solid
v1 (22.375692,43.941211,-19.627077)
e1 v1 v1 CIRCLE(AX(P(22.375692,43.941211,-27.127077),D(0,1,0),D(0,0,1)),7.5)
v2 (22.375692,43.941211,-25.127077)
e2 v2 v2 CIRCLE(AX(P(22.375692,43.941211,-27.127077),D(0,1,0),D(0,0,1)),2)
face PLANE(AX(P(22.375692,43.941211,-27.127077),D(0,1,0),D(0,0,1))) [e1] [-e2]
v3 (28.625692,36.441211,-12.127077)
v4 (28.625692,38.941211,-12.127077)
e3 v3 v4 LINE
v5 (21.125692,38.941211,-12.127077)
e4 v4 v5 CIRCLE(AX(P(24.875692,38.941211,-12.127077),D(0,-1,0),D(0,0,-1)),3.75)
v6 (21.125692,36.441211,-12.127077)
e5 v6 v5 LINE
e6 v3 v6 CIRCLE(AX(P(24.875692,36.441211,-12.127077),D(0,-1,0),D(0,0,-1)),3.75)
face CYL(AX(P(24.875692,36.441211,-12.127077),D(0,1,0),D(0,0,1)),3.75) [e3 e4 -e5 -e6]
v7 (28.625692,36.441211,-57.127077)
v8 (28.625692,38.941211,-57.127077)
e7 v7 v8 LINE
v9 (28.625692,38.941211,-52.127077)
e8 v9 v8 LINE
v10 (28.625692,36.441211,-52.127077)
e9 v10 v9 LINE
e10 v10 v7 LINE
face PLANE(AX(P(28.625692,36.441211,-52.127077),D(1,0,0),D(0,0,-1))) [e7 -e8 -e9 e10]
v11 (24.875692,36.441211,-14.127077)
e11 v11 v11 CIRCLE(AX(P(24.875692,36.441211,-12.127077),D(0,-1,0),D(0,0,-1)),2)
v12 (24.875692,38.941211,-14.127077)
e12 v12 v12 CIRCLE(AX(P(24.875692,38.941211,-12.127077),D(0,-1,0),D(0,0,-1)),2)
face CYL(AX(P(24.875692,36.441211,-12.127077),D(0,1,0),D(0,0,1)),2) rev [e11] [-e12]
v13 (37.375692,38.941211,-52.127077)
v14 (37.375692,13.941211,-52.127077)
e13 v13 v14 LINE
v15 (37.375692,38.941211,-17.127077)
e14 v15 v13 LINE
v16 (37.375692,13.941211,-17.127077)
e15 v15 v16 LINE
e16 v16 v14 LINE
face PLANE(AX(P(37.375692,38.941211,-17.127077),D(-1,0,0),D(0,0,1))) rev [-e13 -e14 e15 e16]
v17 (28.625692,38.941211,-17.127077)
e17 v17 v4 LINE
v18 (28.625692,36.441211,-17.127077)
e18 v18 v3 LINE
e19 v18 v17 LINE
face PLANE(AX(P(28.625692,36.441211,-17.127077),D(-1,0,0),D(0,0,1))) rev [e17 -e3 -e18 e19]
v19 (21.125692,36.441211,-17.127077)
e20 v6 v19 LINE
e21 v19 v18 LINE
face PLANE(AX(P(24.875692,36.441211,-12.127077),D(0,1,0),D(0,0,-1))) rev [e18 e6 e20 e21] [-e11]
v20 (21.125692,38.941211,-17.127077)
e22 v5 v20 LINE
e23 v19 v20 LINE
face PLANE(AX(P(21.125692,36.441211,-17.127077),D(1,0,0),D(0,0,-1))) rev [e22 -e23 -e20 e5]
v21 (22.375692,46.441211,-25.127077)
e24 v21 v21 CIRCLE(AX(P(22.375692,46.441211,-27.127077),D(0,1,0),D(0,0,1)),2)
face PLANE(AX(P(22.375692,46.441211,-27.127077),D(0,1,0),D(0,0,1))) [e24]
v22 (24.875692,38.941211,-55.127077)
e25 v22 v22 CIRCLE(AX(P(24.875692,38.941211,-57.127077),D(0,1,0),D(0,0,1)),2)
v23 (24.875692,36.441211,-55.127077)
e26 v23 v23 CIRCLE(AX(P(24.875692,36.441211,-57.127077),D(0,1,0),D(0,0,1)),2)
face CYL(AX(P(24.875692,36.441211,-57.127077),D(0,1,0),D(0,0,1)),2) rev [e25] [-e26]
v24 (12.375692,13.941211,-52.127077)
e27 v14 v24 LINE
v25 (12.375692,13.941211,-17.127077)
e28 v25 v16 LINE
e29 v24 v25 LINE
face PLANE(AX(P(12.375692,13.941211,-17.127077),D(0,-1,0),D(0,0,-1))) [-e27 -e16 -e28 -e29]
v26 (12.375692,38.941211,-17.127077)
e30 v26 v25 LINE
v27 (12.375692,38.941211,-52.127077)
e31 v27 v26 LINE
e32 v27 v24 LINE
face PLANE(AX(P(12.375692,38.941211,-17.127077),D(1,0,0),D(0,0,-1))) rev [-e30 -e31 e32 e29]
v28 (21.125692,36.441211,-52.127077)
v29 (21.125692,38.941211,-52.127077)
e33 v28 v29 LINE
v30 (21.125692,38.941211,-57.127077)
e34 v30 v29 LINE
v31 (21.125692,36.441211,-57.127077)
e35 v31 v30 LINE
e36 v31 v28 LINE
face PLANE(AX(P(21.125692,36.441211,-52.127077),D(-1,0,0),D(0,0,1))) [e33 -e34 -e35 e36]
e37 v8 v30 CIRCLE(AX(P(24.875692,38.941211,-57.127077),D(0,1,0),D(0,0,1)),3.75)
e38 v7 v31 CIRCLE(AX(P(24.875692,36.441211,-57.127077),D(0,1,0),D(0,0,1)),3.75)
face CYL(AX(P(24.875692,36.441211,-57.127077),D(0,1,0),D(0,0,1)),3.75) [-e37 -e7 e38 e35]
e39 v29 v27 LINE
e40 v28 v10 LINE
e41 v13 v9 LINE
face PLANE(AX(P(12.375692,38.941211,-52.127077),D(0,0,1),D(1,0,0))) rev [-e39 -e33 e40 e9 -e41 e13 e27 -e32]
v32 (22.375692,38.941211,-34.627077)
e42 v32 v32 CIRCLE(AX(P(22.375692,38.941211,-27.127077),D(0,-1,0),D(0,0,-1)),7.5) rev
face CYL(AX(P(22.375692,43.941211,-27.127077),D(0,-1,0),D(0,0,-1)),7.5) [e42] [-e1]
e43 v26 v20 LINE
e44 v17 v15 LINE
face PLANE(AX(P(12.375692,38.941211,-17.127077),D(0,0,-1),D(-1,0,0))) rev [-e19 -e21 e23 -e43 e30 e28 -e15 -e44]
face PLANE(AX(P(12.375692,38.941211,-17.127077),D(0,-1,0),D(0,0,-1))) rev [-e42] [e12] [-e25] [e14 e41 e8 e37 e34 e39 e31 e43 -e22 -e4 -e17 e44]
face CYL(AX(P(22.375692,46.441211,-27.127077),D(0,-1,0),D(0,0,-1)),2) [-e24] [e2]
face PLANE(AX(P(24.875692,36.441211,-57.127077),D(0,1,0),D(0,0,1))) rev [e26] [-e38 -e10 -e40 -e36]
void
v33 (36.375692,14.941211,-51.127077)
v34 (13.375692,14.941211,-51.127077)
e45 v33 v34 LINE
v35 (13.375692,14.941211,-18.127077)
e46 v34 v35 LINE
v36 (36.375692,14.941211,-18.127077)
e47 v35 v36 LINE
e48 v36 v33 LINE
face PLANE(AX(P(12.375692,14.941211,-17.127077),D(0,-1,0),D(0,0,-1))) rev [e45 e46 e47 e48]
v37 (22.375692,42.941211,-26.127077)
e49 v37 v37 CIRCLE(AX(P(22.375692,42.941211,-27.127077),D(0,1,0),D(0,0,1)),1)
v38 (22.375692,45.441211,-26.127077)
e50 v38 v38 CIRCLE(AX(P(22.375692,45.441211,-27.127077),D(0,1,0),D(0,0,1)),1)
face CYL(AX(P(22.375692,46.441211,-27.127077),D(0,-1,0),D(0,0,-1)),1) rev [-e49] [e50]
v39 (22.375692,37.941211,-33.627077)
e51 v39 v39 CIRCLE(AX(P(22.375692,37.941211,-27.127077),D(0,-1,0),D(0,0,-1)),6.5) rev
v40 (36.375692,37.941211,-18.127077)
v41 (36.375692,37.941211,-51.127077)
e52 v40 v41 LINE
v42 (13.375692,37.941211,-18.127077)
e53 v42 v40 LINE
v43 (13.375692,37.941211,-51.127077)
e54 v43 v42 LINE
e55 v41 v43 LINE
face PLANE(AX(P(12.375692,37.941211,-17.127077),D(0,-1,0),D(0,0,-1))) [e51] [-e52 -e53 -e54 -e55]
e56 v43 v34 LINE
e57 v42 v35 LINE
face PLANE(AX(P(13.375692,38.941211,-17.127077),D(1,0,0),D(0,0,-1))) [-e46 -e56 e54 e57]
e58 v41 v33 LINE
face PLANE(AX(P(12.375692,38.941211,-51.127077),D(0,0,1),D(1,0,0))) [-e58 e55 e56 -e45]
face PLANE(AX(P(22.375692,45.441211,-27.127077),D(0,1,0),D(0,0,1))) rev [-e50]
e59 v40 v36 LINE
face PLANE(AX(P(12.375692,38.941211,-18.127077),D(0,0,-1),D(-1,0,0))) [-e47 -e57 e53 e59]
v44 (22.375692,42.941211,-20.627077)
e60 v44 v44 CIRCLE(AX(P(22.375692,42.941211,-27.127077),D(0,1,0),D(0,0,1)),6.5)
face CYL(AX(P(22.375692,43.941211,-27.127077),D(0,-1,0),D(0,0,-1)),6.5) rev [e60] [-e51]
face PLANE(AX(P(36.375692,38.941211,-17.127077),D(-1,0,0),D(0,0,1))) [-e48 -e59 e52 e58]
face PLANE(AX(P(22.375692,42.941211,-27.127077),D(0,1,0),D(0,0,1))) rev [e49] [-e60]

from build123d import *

# Parameters (mm, degrees)
SKETCH1_W           = 50
SKETCH1_H           = 70
BOSS_EXTRUDE1_DEPTH = 50
SKETCH2_R           = 15
BOSS_EXTRUDE2_DEPTH = 10
SKETCH3_R           = 4
BOSS_EXTRUDE3_DEPTH = 5
SHELL7_START        = 2
SHELL7_OUTLINE_W    = 46
SHELL7_OUTLINE_H    = 66
SHELL7_DEPTH        = 46
SHELL7_START_2      = 48
SHELL7_2_OUTLINE_R  = 13
SHELL7_2_DEPTH      = 10
SHELL7_START_3      = 58
SHELL7_3_OUTLINE_R  = 2
SHELL7_3_DEPTH      = 5
SKETCH4_R           = 4
BOSS_EXTRUDE4_DEPTH = 5
SCALE1_SCALE        = 0.5


# Read off the part's stored shape, not the designer's step: Shell7
with BuildPart() as part:
    # Sketch1 → Boss-Extrude1 (new body)
    with BuildSketch(Plane(origin=(0, 0, 0), x_dir=(1, 0, 0), z_dir=(0, 1, 0))):
        with Locations((25, 35)):
            Rectangle(SKETCH1_W, SKETCH1_H)
    extrude(amount=BOSS_EXTRUDE1_DEPTH)

    # Sketch2 → Boss-Extrude2 (add)
    with BuildSketch(Plane(origin=(0, 50, 0), x_dir=(1, 0, 0), z_dir=(0, 1, 0))):
        with Locations(Location((20, 20, 0), (0, 0, 90))):
            Circle(SKETCH2_R)
    extrude(amount=BOSS_EXTRUDE2_DEPTH)

    # Sketch3 → Boss-Extrude3 (add)
    with BuildSketch(Plane(origin=(0, 60, 0), x_dir=(1, 0, 0), z_dir=(0, 1, 0))):
        with Locations(Location((20, 20, 0), (0, 0, 270))):
            Circle(SKETCH3_R)
    extrude(amount=BOSS_EXTRUDE3_DEPTH)

    # Shell7 outline → Shell7 (cut)
    with BuildSketch(Plane(origin=(0, 0, 0), x_dir=(1, 0, 0), z_dir=(0, 1, 0)).offset(SHELL7_START)):
        with Locations((25, 35)):
            Rectangle(SHELL7_OUTLINE_W, SHELL7_OUTLINE_H)
    extrude(amount=SHELL7_DEPTH, mode=Mode.SUBTRACT)

    # Shell7 2 outline → Shell7 2 (cut)
    with BuildSketch(Plane(origin=(0, 0, 0), x_dir=(1, 0, 0), z_dir=(0, 1, 0)).offset(SHELL7_START_2)):
        with Locations((20, 20)):
            Circle(SHELL7_2_OUTLINE_R)
    extrude(amount=SHELL7_2_DEPTH, mode=Mode.SUBTRACT)

    # Shell7 3 outline → Shell7 3 (cut)
    with BuildSketch(Plane(origin=(0, 0, 0), x_dir=(1, 0, 0), z_dir=(0, 1, 0)).offset(SHELL7_START_3)):
        with Locations((20, 20)):
            Circle(SHELL7_3_OUTLINE_R)
    extrude(amount=SHELL7_3_DEPTH, mode=Mode.SUBTRACT)

    # Sketch4 → Boss-Extrude4 (add)
    with BuildSketch(Plane(origin=(0, 50, 0), x_dir=(1, 0, 0), z_dir=(0, 1, 0))):
        with BuildLine():
            Line((17.5, 70), (32.5, 70))
            Line((32.5, 70), (32.5, 80))
            ThreePointArc((32.5, 80), (25, 87.5), (17.5, 80))
            Line((17.5, 80), (17.5, 70))
        make_face()
        with Locations(Location((25, 80, 0), (0, 0, 270))):
            Circle(SKETCH4_R, mode=Mode.SUBTRACT)
    boss_extrude4 = extrude(amount=-BOSS_EXTRUDE4_DEPTH)

    # Mirror1: Boss-Extrude4 across plane
    add(boss_extrude4.mirror(Plane(origin=(0, 0, -35), x_dir=(1, 0, 0), z_dir=(0, 0, -1))))


with BuildPart() as part_1:
    # Scale1: scaled about (24.751384616, 27.88242139, -34.254153849)
    add(part.part.scale(SCALE1_SCALE).moved(Location((12.375692308, 13.941210695, -17.127076924))))


solid = part_1.part
